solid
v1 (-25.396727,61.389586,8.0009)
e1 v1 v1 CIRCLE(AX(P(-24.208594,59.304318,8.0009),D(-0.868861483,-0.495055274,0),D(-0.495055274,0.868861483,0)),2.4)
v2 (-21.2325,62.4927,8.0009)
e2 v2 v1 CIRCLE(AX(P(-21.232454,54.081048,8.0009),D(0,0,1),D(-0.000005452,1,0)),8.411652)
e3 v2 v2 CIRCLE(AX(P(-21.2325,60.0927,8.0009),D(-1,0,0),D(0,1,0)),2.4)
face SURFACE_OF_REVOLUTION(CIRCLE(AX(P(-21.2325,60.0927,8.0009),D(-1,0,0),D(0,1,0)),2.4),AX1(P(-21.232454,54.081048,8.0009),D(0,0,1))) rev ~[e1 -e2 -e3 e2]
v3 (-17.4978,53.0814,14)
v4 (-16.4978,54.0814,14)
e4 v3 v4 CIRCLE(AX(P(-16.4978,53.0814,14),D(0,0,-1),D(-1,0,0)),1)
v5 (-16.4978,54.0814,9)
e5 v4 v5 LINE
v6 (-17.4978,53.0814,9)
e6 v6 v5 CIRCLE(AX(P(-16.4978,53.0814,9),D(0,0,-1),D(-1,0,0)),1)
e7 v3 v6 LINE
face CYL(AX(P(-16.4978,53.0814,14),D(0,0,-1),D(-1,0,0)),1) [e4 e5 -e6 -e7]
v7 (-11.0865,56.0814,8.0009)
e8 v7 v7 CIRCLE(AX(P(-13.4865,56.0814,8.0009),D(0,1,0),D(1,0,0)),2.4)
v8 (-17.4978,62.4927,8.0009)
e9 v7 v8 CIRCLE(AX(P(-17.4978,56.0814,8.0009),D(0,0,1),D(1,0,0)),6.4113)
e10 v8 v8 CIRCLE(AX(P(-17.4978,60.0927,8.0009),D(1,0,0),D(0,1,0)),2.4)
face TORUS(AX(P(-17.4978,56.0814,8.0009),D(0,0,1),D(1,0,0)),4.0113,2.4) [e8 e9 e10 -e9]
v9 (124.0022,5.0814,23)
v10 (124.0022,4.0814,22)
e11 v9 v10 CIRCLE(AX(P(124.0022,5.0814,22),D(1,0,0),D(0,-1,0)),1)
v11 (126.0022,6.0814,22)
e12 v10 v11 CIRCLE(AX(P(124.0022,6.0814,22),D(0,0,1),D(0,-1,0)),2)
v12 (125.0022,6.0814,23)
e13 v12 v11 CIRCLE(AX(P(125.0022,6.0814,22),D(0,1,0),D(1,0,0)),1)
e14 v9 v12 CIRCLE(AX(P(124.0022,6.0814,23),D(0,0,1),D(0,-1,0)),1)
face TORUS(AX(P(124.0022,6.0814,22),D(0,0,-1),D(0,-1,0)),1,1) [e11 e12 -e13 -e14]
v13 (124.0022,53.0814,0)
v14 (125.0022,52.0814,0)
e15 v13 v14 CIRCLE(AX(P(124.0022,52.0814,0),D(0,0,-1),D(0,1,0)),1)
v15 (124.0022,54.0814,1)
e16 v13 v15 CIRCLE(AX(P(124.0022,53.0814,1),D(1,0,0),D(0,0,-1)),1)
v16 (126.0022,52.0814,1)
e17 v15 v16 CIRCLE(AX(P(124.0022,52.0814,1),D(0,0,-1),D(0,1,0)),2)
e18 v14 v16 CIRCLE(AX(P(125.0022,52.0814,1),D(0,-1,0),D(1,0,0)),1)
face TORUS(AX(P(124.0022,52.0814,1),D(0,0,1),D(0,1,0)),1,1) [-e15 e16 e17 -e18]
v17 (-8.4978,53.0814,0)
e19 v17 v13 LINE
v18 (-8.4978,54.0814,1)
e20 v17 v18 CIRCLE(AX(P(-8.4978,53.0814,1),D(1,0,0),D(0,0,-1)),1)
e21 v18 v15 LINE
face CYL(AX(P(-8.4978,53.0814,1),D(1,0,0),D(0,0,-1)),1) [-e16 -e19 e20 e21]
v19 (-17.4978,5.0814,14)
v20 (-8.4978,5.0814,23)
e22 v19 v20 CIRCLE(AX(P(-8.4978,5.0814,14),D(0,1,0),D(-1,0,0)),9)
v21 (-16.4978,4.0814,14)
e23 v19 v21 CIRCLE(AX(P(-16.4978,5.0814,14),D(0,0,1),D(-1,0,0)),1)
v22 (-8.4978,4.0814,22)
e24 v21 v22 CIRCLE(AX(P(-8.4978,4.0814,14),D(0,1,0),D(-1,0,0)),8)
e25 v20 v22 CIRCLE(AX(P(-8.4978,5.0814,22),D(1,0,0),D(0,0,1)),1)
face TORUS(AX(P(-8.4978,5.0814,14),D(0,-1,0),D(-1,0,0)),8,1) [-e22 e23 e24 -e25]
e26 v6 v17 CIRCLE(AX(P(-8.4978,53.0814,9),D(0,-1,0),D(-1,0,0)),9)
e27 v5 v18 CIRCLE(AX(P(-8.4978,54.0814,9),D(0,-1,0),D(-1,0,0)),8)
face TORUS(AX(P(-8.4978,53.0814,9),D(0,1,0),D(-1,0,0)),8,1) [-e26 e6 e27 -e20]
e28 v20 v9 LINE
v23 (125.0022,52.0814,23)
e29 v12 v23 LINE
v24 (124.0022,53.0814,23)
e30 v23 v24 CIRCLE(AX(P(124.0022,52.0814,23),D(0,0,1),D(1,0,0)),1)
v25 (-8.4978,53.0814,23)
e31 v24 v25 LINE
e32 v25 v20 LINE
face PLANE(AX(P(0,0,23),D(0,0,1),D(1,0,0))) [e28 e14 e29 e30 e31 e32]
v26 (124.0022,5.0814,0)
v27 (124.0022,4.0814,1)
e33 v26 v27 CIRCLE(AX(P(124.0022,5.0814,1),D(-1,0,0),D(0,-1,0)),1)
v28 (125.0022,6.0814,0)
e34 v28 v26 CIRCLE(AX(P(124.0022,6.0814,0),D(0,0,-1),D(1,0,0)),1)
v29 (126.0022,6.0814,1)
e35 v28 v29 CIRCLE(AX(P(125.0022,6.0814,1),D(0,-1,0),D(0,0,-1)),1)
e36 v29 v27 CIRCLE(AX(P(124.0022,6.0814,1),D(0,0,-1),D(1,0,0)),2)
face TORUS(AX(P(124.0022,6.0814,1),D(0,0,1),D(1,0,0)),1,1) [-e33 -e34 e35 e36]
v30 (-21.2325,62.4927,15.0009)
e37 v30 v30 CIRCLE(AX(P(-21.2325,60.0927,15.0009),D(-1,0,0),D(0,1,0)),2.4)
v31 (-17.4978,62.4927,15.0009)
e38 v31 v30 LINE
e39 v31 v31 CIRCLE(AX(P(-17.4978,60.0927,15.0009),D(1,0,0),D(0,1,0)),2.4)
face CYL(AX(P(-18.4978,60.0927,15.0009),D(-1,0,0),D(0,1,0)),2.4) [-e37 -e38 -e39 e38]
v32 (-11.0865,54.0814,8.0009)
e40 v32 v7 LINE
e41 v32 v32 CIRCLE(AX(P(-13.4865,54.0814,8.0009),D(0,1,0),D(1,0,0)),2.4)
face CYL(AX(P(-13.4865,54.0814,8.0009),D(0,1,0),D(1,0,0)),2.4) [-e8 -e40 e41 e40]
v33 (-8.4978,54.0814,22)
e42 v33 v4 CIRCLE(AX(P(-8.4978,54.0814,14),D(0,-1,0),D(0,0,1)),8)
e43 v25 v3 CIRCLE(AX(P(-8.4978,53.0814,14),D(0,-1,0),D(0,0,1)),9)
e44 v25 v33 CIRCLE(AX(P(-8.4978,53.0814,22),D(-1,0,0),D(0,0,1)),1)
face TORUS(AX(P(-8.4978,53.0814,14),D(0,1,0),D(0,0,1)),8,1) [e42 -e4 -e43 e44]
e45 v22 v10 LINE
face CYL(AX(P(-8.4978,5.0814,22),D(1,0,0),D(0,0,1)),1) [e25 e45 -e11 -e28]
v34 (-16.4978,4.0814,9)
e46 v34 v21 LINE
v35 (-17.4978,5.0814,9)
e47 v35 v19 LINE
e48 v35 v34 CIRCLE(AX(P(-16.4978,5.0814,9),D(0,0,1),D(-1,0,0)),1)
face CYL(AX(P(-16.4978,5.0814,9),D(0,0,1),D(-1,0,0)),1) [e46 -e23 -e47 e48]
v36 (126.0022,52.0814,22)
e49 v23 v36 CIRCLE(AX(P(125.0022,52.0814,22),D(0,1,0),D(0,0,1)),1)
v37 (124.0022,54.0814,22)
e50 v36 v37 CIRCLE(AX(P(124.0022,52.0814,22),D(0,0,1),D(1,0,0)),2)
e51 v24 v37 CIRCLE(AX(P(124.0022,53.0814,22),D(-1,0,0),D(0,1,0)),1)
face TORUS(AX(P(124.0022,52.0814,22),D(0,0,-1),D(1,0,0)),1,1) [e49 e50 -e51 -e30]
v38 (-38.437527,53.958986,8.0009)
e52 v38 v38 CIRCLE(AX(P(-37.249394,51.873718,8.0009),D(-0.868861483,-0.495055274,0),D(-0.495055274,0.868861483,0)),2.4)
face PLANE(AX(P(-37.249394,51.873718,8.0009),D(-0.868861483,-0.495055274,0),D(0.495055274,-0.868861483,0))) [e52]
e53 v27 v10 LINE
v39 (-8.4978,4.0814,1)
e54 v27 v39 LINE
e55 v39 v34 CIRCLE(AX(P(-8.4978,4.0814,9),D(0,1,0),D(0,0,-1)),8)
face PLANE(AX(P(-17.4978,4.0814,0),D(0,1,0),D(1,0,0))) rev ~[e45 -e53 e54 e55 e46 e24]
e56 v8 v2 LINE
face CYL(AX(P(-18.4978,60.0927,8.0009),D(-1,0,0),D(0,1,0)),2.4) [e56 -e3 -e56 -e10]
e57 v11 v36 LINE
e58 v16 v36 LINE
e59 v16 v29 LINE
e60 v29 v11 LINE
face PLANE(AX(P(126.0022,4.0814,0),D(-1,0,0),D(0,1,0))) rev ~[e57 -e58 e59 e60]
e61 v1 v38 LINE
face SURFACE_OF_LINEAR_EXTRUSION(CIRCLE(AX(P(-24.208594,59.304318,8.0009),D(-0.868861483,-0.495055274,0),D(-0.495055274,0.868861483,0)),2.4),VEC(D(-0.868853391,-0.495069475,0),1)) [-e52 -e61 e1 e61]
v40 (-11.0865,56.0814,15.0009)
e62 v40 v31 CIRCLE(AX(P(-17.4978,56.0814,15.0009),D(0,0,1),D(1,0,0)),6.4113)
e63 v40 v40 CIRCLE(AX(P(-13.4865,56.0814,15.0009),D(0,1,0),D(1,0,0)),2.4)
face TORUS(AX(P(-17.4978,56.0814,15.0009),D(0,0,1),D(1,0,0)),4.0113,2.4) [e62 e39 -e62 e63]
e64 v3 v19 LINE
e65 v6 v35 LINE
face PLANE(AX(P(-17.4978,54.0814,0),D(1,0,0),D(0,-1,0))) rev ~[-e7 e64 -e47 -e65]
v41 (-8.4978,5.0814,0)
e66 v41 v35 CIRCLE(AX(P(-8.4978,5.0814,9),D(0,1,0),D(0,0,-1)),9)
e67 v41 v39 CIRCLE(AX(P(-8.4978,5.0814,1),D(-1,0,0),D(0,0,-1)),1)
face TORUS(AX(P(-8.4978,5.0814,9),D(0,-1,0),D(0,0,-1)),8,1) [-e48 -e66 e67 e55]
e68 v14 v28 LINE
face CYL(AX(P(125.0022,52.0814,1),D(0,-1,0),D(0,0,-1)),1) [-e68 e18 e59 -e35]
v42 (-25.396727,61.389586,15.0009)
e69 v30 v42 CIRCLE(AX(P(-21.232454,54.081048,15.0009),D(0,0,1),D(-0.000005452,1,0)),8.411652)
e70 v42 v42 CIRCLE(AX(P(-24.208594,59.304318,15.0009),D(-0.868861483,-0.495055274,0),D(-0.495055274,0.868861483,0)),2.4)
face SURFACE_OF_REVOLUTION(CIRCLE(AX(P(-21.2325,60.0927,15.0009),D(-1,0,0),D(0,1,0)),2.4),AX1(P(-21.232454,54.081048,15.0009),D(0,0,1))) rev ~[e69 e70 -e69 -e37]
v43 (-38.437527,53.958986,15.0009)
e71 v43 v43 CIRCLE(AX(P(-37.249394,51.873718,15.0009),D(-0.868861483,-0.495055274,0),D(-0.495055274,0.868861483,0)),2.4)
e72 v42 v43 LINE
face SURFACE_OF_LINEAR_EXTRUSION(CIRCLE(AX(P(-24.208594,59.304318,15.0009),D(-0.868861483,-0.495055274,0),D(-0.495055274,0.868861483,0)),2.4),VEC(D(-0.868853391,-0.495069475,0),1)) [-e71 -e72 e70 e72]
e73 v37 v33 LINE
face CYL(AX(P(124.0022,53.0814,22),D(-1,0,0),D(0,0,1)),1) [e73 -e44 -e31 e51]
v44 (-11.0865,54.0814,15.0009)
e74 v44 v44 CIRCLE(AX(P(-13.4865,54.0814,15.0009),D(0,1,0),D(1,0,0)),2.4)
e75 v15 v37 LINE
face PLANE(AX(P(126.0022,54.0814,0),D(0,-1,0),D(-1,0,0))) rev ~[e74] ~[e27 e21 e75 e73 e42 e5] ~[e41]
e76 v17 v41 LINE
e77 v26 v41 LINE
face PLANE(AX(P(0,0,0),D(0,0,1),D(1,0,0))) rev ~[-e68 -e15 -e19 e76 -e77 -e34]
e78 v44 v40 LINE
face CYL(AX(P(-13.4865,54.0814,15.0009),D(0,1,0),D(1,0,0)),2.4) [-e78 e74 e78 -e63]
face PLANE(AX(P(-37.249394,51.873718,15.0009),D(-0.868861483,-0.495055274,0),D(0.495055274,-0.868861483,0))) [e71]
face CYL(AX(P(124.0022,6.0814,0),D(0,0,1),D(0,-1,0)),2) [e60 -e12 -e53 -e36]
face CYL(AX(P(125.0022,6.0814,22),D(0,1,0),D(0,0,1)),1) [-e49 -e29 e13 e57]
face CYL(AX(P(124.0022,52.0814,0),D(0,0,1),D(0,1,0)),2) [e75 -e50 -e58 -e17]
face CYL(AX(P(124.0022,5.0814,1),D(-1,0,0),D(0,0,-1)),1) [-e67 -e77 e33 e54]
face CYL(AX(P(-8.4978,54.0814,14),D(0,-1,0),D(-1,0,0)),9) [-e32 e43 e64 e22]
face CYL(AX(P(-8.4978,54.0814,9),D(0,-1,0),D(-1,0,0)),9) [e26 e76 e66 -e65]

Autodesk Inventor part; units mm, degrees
ref_plane "YZ Plane" through (0, 0, 0) normal (1, 0, 0) x (0, 1, 0)
ref_plane "XZ Plane" through (0, 0, 0) normal (0, 1, 0) x (-1, 0, 0)
sketch "Szkic1" plane through (0, 0, 0) normal (0, 0, 1) x (1, 0, 0)
  line L0 (-17.4978, 4.0814) -> (126.0022, 4.0814)
  line L1 (126.0022, 4.0814) -> (126.0022, 54.0814)
  line L2 (126.0022, 54.0814) -> (-17.4978, 54.0814)
  line L3 (-17.4978, 54.0814) -> (-17.4978, 4.0814)
  point P0 (0, 0)
  dimension "d0" = 143.5
  dimension "d1" = 50
extrude "Wyciągnięcie proste1" add sketch "Szkic1" along normal blind 23
fillet "Zaokrąglenie1" radius 9 2 edges at (-17.4978, 29.0814, 23) (-17.4978, 29.0814, 0)
fillet "Zaokrąglenie2" radius 2 2 edges at (126.0022, 4.0814, 11.5) (126.0022, 54.0814, 11.5)
fillet "Zaokrąglenie3" radius 1 16 edges at (125.4164, 4.6672, 23) (126.0022, 29.0814, 23) (125.4164, 53.4956, 23) (57.7522, 54.0814, 23) (-14.8618, 54.0814, 20.364) (-17.4978, 54.0814, 11.5) (-14.8618, 54.0814, 2.636) (57.7522, 54.0814, 0) (125.4164, 53.4956, 0) (126.0022, 29.0814, 0) (125.4164, 4.6672, 0) (57.7522, 4.0814, 0) (-14.8618, 4.0814, 2.636) (-17.4978, 4.0814, 11.5) (-14.8618, 4.0814, 20.364) (57.7522, 4.0814, 23)
sketch "Szkic2" plane through (0, 0, 23) normal (0, 0, 1) x (1, 0, 0)
  line L0 (2.5572, 48.5476) -> (113.8689, 48.5476) construction
  line L1 (113.8689, 48.5476) -> (113.8689, 11.3084) construction
  line L2 (113.8689, 11.3084) -> (2.5572, 11.3084) construction
  line L3 (2.5572, 11.3084) -> (2.5572, 48.5476) construction
  point P0 (0, 0)
ref_plane "Płaszczyzna konstrukcyjna1" through (0, 0, 15) normal (0, 0, 1) x (1, 0, 0)
sketch "Szkic3" plane through (0, 0, 15) normal (0, 0, 1) x (1, 0, 0)
  line L0 (-16.4978, 54.0814) -> (-8.4978, 54.0814) projected
  line L1 (-17.4978, 53.0814) -> (-17.4978, 5.0814) projected
  line L2 (-13.4978, 54.0814) -> (-13.4978, 56.0814)
  line L3 (-18.4978, 60.0814) -> (-17.4978, 60.0814)
  arc A0 (-13.4978, 56.0814) -> (-17.4978, 60.0814) centre (-17.4978, 56.0814) ccw
  line L4 (-18.4978, 60.0814) -> (-21.2325, 60.0814)
  line L5 (-24.203, 59.2945) -> (-37.2438, 51.8639)
  arc A1 (-21.2325, 60.0814) -> (-24.203, 59.2945) centre (-21.2325, 54.0814) ccw
  point P0 (0, 0)
  point P1 (-13.4978, 58.0814)
  dimension "d15" = 4
  dimension "d16" = 4
  dimension "d20" = 4
  dimension "d24" = 6
  dimension "d25" = 6
sketch "Szkic4" plane through (-8.4978, 54.0814, 1) normal (0, 1, 0) x (1, 0, 0)
  circle A0 centre (-4.9887, -14.0009) radius 2.4
  point P0 (8.4978, 1)
  dimension "d21" = 4.8
sweep "Przeciągnięcie1" add profiles "Szkic4" path "Szkic3" path curves L2 A0 L3 L4 A1 L5
pattern_linear "Szyk prostokątny1" count 2 spacing 7 along (0, 0, -1) of "Przeciągnięcie1"
decal "Pokrycie bitmapą1"
properties part number "COTS_ZIPPY_Li-Po_Battery_5000mAh_3S"
